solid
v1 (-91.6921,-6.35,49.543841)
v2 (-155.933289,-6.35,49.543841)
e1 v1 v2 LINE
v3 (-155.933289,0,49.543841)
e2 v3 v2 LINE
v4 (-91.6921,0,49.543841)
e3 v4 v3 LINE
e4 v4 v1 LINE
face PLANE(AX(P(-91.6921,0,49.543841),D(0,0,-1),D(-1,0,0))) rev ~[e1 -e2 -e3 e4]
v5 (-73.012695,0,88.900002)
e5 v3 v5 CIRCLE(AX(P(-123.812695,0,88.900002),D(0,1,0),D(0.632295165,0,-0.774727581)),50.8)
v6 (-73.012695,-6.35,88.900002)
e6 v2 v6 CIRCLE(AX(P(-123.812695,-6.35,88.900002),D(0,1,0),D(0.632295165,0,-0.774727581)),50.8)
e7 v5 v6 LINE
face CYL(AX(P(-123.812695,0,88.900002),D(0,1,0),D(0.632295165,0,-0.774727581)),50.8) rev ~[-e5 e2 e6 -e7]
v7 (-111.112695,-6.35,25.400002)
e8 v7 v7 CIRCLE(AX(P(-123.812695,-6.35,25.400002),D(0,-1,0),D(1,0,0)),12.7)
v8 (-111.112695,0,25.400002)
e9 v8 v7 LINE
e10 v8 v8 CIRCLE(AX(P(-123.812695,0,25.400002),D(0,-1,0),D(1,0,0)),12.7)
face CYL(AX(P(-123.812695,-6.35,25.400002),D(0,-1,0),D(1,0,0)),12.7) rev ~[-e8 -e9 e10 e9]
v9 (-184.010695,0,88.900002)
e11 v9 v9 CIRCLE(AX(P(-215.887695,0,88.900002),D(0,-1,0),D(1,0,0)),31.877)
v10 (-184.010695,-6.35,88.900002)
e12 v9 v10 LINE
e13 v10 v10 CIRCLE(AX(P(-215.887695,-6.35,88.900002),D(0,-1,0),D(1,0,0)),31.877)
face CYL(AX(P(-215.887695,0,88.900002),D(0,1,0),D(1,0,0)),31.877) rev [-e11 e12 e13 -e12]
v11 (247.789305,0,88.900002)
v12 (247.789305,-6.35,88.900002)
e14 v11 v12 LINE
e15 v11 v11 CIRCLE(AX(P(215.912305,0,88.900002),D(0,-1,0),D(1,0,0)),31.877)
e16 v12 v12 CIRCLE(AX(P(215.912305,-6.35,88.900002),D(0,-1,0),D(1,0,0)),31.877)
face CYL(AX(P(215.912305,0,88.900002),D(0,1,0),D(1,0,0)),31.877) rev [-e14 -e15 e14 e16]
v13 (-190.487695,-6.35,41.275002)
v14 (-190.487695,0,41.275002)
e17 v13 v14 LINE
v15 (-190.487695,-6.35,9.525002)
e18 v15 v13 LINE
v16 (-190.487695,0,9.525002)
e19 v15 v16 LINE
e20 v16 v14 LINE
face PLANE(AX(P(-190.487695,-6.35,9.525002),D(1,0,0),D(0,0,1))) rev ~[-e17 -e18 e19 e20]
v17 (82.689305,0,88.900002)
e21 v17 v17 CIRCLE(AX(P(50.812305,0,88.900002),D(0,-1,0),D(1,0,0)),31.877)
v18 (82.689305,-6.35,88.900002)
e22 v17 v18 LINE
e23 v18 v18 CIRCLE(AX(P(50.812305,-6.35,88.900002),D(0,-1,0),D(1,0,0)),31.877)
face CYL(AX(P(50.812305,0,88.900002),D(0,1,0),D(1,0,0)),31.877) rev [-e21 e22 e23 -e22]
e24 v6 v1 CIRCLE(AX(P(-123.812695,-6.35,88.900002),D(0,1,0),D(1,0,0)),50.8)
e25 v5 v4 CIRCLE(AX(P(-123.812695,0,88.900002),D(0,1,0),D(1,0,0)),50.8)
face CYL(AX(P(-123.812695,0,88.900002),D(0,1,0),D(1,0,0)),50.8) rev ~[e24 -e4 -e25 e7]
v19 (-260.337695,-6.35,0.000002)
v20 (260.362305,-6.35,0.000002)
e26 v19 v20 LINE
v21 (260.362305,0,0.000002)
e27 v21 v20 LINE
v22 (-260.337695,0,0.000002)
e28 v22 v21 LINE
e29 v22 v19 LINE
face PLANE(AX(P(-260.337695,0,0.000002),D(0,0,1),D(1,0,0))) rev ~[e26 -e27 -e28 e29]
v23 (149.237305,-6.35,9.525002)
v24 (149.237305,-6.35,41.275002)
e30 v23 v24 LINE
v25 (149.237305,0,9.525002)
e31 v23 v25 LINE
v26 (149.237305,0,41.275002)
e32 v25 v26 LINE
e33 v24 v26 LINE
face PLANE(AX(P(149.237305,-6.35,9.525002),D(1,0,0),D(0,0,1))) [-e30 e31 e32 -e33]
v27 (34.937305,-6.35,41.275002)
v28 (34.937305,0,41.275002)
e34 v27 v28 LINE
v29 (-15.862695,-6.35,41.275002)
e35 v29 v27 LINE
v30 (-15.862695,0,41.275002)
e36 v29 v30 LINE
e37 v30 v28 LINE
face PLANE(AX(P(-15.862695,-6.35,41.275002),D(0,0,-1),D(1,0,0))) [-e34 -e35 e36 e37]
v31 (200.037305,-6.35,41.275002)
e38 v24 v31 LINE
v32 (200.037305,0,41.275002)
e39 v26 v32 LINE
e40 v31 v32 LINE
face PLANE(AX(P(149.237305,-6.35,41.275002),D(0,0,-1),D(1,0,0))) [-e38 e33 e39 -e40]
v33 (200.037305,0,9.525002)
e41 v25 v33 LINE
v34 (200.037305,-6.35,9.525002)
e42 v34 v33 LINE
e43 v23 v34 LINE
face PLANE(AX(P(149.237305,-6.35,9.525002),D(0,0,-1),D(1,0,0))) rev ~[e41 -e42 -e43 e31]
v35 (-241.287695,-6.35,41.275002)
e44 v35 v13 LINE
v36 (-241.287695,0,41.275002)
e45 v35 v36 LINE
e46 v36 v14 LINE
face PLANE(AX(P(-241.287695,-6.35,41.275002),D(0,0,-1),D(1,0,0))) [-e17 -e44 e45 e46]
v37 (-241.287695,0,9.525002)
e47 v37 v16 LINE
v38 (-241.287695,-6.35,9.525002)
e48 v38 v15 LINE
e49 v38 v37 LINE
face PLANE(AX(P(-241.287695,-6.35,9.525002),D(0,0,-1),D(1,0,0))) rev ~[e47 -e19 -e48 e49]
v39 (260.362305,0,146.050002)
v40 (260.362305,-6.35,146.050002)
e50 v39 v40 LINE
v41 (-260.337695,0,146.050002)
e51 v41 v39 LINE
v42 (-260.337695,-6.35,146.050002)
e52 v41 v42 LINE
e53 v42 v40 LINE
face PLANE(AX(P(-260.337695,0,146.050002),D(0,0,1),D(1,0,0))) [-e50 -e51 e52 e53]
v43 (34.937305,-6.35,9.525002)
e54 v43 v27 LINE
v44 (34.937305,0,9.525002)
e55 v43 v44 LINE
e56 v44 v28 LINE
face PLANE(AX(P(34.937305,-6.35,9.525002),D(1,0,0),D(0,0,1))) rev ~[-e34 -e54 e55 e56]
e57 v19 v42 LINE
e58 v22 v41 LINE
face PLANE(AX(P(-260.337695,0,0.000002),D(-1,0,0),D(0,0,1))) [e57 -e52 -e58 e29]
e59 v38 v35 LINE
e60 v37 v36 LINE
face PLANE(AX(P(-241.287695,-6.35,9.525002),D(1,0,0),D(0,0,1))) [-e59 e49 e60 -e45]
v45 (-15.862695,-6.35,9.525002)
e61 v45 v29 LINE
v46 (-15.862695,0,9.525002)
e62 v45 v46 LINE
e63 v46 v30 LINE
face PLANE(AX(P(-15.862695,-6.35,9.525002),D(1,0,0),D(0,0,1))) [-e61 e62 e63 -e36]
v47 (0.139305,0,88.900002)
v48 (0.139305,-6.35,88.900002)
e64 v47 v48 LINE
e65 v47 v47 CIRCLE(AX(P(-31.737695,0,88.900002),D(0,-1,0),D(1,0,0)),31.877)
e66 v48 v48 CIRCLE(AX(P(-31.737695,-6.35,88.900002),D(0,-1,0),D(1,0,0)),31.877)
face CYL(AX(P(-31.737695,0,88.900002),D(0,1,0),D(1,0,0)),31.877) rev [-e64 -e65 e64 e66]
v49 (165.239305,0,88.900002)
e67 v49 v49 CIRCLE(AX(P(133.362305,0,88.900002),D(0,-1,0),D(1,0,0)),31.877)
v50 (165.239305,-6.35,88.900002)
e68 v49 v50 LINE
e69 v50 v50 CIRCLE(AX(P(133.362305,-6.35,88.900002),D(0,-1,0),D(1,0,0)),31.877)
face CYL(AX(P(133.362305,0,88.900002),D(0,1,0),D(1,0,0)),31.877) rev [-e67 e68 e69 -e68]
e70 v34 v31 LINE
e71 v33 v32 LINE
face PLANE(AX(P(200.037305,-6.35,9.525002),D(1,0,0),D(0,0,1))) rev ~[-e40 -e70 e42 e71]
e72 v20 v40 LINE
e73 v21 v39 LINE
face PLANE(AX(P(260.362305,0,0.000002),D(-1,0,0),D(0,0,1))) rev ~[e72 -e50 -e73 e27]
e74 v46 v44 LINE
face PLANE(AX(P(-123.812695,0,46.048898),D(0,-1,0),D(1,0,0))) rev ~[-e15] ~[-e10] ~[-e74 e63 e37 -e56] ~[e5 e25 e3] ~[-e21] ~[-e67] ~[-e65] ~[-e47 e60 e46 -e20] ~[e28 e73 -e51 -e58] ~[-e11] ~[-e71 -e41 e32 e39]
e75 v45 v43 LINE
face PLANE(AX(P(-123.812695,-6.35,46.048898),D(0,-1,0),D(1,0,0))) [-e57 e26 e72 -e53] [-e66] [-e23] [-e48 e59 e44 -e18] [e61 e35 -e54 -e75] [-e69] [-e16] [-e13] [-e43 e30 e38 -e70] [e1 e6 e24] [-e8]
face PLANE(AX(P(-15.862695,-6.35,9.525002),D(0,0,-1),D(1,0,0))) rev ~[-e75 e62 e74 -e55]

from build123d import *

# Parameters (mm, degrees)
F0_W      = 520.7
F0_H      = 146.05
F0_R      = 31.877
F1_DEPTH  = 6.35
F2_DEPTH  = 6.35
F3_R      = 10.0959291711
F3_R_2    = 9.3516208714
F3_R_3    = 9.399866871
F4_DEPTH  = 25.4
F5_R      = 2.413
F6_DEPTH  = 25.4
F7_W      = 6.35
F7_H      = 6.35
F8_DEPTH  = 25.4
F9_W      = 50.8
F9_H      = 31.75
F10_DEPTH = 25.4
F11_R     = 12.7
F12_DEPTH = 12.7


# Not quite as in the source:
# - a feature names something its author has since deleted; it is built from what else it names


with BuildPart() as f1:
    # F0 (on Front) → F1 (new body)
    with BuildSketch(Plane.XZ):
        with Locations((0.0123051805, 73.0250019237)):
            Rectangle(F0_W, F0_H)
        with Locations((-215.8876948195, 88.9000019237)):
            Circle(F0_R, mode=Mode.SUBTRACT)
        with BuildLine():
            ThreePointArc((-155.9332892075, 49.5438408284), (-145.5947264636, 134.7931724118), (-73.0126948195, 88.9000019237))
            ThreePointArc((-73.0126948195, 88.9000019237), (-77.9195243313, 67.1179702796), (-91.6921004315, 49.5438408284))
            ThreePointArc((-91.6921004315, 49.5438408284), (-123.8126948195, 38.1000019237), (-155.9332892075, 49.5438408284))
        make_face(mode=Mode.SUBTRACT)
        with Locations((-31.7376948195, 88.9000019237)):
            Circle(F0_R, mode=Mode.SUBTRACT)
        with Locations((50.8123051805, 88.9000019237)):
            Circle(F0_R, mode=Mode.SUBTRACT)
        with Locations((133.3623051805, 88.9000019237)):
            Circle(F0_R, mode=Mode.SUBTRACT)
        with Locations((215.9123051805, 88.9000019237)):
            Circle(F0_R, mode=Mode.SUBTRACT)
    extrude(amount=F1_DEPTH)

    # F0 (on Front) → F2 (join)
    with BuildSketch(Plane.XZ):
        with BuildLine():
            Line((-91.6921004315, 49.5438408284), (-155.9332892075, 49.5438408284))
            ThreePointArc((-155.9332892075, 49.5438408284), (-123.8126948195, 38.1000019237), (-91.6921004315, 49.5438408284))
        make_face()
    extrude(amount=F2_DEPTH)

    # F3 (on face) → F4 (cut)
    with BuildSketch(Plane.XZ.offset(6.35)):
        with Locations((-215.8876948195, 25.4000019237)):
            Circle(F3_R)
        with Locations((9.5373051805, 25.4000019237)):
            Circle(F3_R_2)
        with Locations((174.6373051805, 25.4000019237)):
            Circle(F3_R_3)
    extrude(amount=-F4_DEPTH, mode=Mode.SUBTRACT)

    # F5 (on face) → F6 (cut)
    with BuildSketch(Plane.XZ.offset(6.35)):
        with Locations((-155.5626948195, 120.6500019237)):
            Circle(F5_R)
        with Locations((-92.0626948195, 120.6500019237)):
            Circle(F5_R)
        with Locations((-92.0626948195, 57.1500019237)):
            Circle(F5_R)
        with Locations((-155.5626948195, 57.1500019237)):
            Circle(F5_R)
    extrude(amount=-F6_DEPTH, mode=Mode.SUBTRACT)

    # F7 (on face) → F8 (cut)
    with BuildSketch(Plane.XZ.offset(6.35)):
        with Locations((-269.875, 142.875)):
            Rectangle(F7_W, F7_H)
        with Locations((269.875, 142.875)):
            Rectangle(F7_W, F7_H)
    extrude(amount=-F8_DEPTH, mode=Mode.SUBTRACT)

    # F9 (on face) → F10 (cut)
    with BuildSketch(Plane.XZ.offset(6.35)):
        with Locations((-215.8876948195, 25.4000019237)):
            Rectangle(F9_W, F9_H)
        with Locations((9.5373051805, 25.4000019237)):
            Rectangle(F9_W, F9_H)
        with Locations((174.6373051805, 25.4000019237)):
            Rectangle(F9_W, F9_H)
    extrude(amount=-F10_DEPTH, mode=Mode.SUBTRACT)

    # F11 (on face) → F12 (cut, symmetric)
    with BuildSketch(Plane.XZ.offset(6.35)):
        with Locations((-123.8126948195, 25.4000019237)):
            Circle(F11_R)
    extrude(amount=F12_DEPTH, both=True, mode=Mode.SUBTRACT)


solid = f1.part
